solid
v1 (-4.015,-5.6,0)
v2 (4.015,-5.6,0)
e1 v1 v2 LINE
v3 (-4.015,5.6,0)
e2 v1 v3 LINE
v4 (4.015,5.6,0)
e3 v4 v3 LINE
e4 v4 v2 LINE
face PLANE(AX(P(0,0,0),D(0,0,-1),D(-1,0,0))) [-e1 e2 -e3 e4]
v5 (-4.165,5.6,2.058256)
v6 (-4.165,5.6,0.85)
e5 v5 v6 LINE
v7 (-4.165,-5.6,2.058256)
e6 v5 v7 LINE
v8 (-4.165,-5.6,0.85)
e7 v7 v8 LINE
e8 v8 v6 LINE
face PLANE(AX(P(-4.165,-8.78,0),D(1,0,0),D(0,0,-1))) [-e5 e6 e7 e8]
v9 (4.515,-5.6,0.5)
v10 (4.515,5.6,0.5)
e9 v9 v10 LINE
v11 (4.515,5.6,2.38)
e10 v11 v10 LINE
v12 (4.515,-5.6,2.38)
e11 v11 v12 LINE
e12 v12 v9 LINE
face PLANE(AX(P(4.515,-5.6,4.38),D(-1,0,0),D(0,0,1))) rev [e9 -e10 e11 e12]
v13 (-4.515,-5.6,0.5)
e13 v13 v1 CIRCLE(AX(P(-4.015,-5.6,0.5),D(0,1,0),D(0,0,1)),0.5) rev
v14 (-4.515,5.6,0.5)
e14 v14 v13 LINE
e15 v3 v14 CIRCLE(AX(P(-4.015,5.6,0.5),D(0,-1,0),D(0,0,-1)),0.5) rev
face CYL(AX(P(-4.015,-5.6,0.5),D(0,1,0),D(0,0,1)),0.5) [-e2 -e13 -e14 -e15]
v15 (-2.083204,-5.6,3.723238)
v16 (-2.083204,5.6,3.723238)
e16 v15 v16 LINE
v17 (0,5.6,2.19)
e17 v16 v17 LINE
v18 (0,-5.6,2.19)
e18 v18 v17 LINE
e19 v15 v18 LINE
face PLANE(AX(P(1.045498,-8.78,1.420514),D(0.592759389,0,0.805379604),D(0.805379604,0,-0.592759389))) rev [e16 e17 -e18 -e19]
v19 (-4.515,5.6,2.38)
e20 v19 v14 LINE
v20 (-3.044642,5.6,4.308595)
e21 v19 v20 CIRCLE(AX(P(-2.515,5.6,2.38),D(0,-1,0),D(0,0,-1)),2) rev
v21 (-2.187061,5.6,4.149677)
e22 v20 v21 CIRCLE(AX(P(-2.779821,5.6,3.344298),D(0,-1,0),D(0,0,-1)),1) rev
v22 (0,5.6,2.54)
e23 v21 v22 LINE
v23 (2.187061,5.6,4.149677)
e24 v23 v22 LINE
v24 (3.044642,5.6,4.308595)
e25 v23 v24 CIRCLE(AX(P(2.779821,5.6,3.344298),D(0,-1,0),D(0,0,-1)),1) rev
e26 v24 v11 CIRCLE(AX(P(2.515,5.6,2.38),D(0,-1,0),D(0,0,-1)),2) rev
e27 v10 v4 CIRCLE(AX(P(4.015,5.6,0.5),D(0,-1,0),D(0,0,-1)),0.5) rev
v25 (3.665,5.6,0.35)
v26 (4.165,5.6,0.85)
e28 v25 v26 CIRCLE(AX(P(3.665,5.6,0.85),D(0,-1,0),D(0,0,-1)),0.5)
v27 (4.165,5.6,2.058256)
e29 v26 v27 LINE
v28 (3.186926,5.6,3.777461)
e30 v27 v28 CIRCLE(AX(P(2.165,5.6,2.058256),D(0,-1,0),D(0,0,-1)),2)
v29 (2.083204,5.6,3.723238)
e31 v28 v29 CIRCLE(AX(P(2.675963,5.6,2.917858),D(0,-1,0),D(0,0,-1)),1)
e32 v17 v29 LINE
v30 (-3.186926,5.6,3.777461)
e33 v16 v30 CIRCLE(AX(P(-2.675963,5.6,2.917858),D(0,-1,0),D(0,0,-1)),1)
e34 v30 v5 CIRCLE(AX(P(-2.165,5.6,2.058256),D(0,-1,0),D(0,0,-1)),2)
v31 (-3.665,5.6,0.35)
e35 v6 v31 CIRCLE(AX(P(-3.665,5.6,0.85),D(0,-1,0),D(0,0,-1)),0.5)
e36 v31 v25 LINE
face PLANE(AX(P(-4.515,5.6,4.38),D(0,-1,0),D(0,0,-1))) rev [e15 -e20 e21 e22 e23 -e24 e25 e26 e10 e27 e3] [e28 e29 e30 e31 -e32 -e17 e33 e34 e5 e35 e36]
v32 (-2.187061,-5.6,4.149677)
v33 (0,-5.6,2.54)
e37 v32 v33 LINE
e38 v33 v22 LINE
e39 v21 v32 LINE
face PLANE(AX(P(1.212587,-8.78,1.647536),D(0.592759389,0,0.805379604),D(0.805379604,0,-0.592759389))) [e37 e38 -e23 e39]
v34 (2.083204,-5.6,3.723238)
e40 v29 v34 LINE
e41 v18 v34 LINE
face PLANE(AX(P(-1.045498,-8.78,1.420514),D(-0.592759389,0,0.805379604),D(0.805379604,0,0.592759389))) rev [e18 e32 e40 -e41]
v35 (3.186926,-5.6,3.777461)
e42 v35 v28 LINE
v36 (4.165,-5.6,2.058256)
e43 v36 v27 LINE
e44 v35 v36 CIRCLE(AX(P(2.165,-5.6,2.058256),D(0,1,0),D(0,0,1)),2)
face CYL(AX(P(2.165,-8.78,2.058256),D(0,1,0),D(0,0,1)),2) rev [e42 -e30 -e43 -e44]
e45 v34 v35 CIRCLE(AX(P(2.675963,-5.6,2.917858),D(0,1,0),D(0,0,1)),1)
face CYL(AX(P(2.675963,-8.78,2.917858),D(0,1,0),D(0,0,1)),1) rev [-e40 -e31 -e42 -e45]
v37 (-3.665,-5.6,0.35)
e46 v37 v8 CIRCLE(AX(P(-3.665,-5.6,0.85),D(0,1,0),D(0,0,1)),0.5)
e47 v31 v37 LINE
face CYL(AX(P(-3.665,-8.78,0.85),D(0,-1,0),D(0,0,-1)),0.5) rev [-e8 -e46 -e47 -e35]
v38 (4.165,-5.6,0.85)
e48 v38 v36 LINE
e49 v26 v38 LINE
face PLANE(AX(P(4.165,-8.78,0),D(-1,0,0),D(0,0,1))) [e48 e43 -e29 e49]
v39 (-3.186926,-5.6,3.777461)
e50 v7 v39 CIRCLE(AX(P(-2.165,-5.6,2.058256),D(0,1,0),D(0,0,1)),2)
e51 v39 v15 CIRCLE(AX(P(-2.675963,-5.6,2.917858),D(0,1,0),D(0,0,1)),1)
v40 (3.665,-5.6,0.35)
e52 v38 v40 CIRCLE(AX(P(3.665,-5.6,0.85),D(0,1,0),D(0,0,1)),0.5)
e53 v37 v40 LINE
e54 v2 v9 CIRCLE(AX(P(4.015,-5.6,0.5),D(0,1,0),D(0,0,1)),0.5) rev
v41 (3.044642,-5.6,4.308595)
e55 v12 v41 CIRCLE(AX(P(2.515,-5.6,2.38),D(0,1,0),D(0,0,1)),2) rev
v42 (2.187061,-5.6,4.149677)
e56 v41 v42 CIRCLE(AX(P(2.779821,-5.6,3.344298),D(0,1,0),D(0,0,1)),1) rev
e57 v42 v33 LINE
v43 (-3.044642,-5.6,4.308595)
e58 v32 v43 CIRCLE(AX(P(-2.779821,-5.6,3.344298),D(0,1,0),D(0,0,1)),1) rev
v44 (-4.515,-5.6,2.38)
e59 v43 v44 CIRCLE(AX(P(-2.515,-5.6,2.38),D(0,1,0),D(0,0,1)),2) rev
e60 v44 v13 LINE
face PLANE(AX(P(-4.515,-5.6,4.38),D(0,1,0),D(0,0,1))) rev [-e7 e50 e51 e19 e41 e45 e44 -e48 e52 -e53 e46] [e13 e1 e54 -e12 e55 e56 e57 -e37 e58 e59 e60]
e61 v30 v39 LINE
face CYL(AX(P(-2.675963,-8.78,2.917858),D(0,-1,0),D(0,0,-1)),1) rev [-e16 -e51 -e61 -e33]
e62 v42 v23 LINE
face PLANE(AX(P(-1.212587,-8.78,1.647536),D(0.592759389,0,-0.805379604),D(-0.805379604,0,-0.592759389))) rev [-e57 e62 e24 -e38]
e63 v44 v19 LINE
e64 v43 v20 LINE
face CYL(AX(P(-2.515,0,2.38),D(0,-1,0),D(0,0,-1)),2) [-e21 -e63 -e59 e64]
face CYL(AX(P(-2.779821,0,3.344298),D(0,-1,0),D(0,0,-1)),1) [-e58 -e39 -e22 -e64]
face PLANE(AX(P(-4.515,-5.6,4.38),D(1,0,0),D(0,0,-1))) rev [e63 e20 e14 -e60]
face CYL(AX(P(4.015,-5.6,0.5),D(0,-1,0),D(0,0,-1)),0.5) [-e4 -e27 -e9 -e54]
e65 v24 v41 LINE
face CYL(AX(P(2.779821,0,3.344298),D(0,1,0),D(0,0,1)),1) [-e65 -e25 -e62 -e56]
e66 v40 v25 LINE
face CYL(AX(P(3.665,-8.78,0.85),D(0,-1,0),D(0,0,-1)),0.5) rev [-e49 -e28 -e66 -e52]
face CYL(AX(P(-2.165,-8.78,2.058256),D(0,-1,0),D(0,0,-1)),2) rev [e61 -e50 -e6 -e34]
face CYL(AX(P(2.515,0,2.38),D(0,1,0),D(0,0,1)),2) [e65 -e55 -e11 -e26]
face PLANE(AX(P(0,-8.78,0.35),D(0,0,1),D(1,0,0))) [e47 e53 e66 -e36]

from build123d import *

# Parameters (mm, degrees)
SKETCH_1_W          = 9.03
SKETCH_1_H          = 11.2
EXTRUDE_1_DEPTH     = 4.38
FILLET_1_R          = 0.5
CUT_EXTRUDE_2_DEPTH = 14.38
FILLET_5_R          = 2
FILLET_6_R          = 1
FILLET_7_R          = 0.5


with BuildPart() as part:
    # 스케치1 → 보스-돌출1 (new body)
    with BuildSketch(Plane.XY):
        Rectangle(SKETCH_1_W, SKETCH_1_H)
    extrude(amount=EXTRUDE_1_DEPTH)

    # 필렛1
    fillet_1_edges = [part.edges().sort_by_distance(p)[0] for p in [
        (-4.515, 0, 0),
        (4.515, 0, 0),
    ]]
    fillet(fillet_1_edges, radius=FILLET_1_R)

    # 스케치2 → 컷-돌출2 (cut)
    with BuildSketch(Plane(origin=(0, 5.6, 0), x_dir=(1, 0, 0), z_dir=(0, 1, 0))):
        Polygon((4.165, -4.03), (4.165, -0.35), (-4.165, -0.35), (-4.165, -4.03), (-2.5, -4.03), (0, -2.19), (2.5, -4.03), align=None)
        Polygon((2.5, -4.38), (2.024456522, -4.03), (-2.024456522, -4.03), (-2.5, -4.38), align=None)
        Polygon((-2.024456522, -4.03), (2.024456522, -4.03), (0, -2.54), align=None)
    extrude(amount=-CUT_EXTRUDE_2_DEPTH, mode=Mode.SUBTRACT)

    # 필렛5
    # the kernel refuses this fillet: 2 mm, written as the material it adds along each edge
    with BuildSketch(Plane(origin=(4.165, 5.6, 4.03), x_dir=(-1, 0, 0), z_dir=(0, -1, 0))) as fillet_5_piece_1:
        with BuildLine():
            CenterArc((2, 1.971744152), FILLET_5_R, 180, 80.357504536)
            Line((0, 1.971744152), (0, 0))
            Line((0, 0), (1.665, 0))
        make_face()
    extrude(amount=11.2)
    with BuildSketch(Plane(origin=(-4.165, 5.6, 4.03), x_dir=(0, 0, -1), z_dir=(0, -1, 0))) as fillet_5_piece_2:
        with BuildLine():
            CenterArc((1.971744152, 2), FILLET_5_R, 189.642495464, 80.357504536)
            Line((0, 1.665), (0, 0))
            Line((0, 0), (1.971744152, 0))
        make_face()
    extrude(amount=11.2)
    # the kernel refuses this fillet: 2 mm, written as the material it takes off along each edge
    with BuildSketch(Plane(origin=(4.515, -10.6, 4.38), x_dir=(0, 0, -1), z_dir=(0, 1, 0))) as fillet_5_2_piece_1:
        with BuildLine():
            CenterArc((FILLET_5_R, FILLET_5_R), FILLET_5_R, 180, 90)
            Line((0, FILLET_5_R), (0, 0))
            Line((0, 0), (FILLET_5_R, 0))
        make_face()
    extrude(amount=21.2, mode=Mode.SUBTRACT)
    with BuildSketch(Plane(origin=(-4.515, 10.6, 4.38), x_dir=(1, 0, 0), z_dir=(0, -1, 0))) as fillet_5_2_piece_2:
        with BuildLine():
            CenterArc((FILLET_5_R, -FILLET_5_R), FILLET_5_R, 90, 90)
            Line((0, -FILLET_5_R), (0, 0))
            Line((0, 0), (FILLET_5_R, 0))
        make_face()
    extrude(amount=21.2, mode=Mode.SUBTRACT)

    # 필렛6
    fillet_6_edges = [part.edges().sort_by_distance(p)[0] for p in [
        (2.5, 0, 4.03),
        (2.5, 0, 4.38),
        (-2.5, 0, 4.38),
        (-2.5, 0, 4.03),
    ]]
    fillet(fillet_6_edges, radius=FILLET_6_R)

    # 필렛7
    fillet_7_edges = [part.edges().sort_by_distance(p)[0] for p in [
        (-4.165, 0, 0.35),
        (4.165, 0, 0.35),
    ]]
    fillet(fillet_7_edges, radius=FILLET_7_R)


solid = part.part
